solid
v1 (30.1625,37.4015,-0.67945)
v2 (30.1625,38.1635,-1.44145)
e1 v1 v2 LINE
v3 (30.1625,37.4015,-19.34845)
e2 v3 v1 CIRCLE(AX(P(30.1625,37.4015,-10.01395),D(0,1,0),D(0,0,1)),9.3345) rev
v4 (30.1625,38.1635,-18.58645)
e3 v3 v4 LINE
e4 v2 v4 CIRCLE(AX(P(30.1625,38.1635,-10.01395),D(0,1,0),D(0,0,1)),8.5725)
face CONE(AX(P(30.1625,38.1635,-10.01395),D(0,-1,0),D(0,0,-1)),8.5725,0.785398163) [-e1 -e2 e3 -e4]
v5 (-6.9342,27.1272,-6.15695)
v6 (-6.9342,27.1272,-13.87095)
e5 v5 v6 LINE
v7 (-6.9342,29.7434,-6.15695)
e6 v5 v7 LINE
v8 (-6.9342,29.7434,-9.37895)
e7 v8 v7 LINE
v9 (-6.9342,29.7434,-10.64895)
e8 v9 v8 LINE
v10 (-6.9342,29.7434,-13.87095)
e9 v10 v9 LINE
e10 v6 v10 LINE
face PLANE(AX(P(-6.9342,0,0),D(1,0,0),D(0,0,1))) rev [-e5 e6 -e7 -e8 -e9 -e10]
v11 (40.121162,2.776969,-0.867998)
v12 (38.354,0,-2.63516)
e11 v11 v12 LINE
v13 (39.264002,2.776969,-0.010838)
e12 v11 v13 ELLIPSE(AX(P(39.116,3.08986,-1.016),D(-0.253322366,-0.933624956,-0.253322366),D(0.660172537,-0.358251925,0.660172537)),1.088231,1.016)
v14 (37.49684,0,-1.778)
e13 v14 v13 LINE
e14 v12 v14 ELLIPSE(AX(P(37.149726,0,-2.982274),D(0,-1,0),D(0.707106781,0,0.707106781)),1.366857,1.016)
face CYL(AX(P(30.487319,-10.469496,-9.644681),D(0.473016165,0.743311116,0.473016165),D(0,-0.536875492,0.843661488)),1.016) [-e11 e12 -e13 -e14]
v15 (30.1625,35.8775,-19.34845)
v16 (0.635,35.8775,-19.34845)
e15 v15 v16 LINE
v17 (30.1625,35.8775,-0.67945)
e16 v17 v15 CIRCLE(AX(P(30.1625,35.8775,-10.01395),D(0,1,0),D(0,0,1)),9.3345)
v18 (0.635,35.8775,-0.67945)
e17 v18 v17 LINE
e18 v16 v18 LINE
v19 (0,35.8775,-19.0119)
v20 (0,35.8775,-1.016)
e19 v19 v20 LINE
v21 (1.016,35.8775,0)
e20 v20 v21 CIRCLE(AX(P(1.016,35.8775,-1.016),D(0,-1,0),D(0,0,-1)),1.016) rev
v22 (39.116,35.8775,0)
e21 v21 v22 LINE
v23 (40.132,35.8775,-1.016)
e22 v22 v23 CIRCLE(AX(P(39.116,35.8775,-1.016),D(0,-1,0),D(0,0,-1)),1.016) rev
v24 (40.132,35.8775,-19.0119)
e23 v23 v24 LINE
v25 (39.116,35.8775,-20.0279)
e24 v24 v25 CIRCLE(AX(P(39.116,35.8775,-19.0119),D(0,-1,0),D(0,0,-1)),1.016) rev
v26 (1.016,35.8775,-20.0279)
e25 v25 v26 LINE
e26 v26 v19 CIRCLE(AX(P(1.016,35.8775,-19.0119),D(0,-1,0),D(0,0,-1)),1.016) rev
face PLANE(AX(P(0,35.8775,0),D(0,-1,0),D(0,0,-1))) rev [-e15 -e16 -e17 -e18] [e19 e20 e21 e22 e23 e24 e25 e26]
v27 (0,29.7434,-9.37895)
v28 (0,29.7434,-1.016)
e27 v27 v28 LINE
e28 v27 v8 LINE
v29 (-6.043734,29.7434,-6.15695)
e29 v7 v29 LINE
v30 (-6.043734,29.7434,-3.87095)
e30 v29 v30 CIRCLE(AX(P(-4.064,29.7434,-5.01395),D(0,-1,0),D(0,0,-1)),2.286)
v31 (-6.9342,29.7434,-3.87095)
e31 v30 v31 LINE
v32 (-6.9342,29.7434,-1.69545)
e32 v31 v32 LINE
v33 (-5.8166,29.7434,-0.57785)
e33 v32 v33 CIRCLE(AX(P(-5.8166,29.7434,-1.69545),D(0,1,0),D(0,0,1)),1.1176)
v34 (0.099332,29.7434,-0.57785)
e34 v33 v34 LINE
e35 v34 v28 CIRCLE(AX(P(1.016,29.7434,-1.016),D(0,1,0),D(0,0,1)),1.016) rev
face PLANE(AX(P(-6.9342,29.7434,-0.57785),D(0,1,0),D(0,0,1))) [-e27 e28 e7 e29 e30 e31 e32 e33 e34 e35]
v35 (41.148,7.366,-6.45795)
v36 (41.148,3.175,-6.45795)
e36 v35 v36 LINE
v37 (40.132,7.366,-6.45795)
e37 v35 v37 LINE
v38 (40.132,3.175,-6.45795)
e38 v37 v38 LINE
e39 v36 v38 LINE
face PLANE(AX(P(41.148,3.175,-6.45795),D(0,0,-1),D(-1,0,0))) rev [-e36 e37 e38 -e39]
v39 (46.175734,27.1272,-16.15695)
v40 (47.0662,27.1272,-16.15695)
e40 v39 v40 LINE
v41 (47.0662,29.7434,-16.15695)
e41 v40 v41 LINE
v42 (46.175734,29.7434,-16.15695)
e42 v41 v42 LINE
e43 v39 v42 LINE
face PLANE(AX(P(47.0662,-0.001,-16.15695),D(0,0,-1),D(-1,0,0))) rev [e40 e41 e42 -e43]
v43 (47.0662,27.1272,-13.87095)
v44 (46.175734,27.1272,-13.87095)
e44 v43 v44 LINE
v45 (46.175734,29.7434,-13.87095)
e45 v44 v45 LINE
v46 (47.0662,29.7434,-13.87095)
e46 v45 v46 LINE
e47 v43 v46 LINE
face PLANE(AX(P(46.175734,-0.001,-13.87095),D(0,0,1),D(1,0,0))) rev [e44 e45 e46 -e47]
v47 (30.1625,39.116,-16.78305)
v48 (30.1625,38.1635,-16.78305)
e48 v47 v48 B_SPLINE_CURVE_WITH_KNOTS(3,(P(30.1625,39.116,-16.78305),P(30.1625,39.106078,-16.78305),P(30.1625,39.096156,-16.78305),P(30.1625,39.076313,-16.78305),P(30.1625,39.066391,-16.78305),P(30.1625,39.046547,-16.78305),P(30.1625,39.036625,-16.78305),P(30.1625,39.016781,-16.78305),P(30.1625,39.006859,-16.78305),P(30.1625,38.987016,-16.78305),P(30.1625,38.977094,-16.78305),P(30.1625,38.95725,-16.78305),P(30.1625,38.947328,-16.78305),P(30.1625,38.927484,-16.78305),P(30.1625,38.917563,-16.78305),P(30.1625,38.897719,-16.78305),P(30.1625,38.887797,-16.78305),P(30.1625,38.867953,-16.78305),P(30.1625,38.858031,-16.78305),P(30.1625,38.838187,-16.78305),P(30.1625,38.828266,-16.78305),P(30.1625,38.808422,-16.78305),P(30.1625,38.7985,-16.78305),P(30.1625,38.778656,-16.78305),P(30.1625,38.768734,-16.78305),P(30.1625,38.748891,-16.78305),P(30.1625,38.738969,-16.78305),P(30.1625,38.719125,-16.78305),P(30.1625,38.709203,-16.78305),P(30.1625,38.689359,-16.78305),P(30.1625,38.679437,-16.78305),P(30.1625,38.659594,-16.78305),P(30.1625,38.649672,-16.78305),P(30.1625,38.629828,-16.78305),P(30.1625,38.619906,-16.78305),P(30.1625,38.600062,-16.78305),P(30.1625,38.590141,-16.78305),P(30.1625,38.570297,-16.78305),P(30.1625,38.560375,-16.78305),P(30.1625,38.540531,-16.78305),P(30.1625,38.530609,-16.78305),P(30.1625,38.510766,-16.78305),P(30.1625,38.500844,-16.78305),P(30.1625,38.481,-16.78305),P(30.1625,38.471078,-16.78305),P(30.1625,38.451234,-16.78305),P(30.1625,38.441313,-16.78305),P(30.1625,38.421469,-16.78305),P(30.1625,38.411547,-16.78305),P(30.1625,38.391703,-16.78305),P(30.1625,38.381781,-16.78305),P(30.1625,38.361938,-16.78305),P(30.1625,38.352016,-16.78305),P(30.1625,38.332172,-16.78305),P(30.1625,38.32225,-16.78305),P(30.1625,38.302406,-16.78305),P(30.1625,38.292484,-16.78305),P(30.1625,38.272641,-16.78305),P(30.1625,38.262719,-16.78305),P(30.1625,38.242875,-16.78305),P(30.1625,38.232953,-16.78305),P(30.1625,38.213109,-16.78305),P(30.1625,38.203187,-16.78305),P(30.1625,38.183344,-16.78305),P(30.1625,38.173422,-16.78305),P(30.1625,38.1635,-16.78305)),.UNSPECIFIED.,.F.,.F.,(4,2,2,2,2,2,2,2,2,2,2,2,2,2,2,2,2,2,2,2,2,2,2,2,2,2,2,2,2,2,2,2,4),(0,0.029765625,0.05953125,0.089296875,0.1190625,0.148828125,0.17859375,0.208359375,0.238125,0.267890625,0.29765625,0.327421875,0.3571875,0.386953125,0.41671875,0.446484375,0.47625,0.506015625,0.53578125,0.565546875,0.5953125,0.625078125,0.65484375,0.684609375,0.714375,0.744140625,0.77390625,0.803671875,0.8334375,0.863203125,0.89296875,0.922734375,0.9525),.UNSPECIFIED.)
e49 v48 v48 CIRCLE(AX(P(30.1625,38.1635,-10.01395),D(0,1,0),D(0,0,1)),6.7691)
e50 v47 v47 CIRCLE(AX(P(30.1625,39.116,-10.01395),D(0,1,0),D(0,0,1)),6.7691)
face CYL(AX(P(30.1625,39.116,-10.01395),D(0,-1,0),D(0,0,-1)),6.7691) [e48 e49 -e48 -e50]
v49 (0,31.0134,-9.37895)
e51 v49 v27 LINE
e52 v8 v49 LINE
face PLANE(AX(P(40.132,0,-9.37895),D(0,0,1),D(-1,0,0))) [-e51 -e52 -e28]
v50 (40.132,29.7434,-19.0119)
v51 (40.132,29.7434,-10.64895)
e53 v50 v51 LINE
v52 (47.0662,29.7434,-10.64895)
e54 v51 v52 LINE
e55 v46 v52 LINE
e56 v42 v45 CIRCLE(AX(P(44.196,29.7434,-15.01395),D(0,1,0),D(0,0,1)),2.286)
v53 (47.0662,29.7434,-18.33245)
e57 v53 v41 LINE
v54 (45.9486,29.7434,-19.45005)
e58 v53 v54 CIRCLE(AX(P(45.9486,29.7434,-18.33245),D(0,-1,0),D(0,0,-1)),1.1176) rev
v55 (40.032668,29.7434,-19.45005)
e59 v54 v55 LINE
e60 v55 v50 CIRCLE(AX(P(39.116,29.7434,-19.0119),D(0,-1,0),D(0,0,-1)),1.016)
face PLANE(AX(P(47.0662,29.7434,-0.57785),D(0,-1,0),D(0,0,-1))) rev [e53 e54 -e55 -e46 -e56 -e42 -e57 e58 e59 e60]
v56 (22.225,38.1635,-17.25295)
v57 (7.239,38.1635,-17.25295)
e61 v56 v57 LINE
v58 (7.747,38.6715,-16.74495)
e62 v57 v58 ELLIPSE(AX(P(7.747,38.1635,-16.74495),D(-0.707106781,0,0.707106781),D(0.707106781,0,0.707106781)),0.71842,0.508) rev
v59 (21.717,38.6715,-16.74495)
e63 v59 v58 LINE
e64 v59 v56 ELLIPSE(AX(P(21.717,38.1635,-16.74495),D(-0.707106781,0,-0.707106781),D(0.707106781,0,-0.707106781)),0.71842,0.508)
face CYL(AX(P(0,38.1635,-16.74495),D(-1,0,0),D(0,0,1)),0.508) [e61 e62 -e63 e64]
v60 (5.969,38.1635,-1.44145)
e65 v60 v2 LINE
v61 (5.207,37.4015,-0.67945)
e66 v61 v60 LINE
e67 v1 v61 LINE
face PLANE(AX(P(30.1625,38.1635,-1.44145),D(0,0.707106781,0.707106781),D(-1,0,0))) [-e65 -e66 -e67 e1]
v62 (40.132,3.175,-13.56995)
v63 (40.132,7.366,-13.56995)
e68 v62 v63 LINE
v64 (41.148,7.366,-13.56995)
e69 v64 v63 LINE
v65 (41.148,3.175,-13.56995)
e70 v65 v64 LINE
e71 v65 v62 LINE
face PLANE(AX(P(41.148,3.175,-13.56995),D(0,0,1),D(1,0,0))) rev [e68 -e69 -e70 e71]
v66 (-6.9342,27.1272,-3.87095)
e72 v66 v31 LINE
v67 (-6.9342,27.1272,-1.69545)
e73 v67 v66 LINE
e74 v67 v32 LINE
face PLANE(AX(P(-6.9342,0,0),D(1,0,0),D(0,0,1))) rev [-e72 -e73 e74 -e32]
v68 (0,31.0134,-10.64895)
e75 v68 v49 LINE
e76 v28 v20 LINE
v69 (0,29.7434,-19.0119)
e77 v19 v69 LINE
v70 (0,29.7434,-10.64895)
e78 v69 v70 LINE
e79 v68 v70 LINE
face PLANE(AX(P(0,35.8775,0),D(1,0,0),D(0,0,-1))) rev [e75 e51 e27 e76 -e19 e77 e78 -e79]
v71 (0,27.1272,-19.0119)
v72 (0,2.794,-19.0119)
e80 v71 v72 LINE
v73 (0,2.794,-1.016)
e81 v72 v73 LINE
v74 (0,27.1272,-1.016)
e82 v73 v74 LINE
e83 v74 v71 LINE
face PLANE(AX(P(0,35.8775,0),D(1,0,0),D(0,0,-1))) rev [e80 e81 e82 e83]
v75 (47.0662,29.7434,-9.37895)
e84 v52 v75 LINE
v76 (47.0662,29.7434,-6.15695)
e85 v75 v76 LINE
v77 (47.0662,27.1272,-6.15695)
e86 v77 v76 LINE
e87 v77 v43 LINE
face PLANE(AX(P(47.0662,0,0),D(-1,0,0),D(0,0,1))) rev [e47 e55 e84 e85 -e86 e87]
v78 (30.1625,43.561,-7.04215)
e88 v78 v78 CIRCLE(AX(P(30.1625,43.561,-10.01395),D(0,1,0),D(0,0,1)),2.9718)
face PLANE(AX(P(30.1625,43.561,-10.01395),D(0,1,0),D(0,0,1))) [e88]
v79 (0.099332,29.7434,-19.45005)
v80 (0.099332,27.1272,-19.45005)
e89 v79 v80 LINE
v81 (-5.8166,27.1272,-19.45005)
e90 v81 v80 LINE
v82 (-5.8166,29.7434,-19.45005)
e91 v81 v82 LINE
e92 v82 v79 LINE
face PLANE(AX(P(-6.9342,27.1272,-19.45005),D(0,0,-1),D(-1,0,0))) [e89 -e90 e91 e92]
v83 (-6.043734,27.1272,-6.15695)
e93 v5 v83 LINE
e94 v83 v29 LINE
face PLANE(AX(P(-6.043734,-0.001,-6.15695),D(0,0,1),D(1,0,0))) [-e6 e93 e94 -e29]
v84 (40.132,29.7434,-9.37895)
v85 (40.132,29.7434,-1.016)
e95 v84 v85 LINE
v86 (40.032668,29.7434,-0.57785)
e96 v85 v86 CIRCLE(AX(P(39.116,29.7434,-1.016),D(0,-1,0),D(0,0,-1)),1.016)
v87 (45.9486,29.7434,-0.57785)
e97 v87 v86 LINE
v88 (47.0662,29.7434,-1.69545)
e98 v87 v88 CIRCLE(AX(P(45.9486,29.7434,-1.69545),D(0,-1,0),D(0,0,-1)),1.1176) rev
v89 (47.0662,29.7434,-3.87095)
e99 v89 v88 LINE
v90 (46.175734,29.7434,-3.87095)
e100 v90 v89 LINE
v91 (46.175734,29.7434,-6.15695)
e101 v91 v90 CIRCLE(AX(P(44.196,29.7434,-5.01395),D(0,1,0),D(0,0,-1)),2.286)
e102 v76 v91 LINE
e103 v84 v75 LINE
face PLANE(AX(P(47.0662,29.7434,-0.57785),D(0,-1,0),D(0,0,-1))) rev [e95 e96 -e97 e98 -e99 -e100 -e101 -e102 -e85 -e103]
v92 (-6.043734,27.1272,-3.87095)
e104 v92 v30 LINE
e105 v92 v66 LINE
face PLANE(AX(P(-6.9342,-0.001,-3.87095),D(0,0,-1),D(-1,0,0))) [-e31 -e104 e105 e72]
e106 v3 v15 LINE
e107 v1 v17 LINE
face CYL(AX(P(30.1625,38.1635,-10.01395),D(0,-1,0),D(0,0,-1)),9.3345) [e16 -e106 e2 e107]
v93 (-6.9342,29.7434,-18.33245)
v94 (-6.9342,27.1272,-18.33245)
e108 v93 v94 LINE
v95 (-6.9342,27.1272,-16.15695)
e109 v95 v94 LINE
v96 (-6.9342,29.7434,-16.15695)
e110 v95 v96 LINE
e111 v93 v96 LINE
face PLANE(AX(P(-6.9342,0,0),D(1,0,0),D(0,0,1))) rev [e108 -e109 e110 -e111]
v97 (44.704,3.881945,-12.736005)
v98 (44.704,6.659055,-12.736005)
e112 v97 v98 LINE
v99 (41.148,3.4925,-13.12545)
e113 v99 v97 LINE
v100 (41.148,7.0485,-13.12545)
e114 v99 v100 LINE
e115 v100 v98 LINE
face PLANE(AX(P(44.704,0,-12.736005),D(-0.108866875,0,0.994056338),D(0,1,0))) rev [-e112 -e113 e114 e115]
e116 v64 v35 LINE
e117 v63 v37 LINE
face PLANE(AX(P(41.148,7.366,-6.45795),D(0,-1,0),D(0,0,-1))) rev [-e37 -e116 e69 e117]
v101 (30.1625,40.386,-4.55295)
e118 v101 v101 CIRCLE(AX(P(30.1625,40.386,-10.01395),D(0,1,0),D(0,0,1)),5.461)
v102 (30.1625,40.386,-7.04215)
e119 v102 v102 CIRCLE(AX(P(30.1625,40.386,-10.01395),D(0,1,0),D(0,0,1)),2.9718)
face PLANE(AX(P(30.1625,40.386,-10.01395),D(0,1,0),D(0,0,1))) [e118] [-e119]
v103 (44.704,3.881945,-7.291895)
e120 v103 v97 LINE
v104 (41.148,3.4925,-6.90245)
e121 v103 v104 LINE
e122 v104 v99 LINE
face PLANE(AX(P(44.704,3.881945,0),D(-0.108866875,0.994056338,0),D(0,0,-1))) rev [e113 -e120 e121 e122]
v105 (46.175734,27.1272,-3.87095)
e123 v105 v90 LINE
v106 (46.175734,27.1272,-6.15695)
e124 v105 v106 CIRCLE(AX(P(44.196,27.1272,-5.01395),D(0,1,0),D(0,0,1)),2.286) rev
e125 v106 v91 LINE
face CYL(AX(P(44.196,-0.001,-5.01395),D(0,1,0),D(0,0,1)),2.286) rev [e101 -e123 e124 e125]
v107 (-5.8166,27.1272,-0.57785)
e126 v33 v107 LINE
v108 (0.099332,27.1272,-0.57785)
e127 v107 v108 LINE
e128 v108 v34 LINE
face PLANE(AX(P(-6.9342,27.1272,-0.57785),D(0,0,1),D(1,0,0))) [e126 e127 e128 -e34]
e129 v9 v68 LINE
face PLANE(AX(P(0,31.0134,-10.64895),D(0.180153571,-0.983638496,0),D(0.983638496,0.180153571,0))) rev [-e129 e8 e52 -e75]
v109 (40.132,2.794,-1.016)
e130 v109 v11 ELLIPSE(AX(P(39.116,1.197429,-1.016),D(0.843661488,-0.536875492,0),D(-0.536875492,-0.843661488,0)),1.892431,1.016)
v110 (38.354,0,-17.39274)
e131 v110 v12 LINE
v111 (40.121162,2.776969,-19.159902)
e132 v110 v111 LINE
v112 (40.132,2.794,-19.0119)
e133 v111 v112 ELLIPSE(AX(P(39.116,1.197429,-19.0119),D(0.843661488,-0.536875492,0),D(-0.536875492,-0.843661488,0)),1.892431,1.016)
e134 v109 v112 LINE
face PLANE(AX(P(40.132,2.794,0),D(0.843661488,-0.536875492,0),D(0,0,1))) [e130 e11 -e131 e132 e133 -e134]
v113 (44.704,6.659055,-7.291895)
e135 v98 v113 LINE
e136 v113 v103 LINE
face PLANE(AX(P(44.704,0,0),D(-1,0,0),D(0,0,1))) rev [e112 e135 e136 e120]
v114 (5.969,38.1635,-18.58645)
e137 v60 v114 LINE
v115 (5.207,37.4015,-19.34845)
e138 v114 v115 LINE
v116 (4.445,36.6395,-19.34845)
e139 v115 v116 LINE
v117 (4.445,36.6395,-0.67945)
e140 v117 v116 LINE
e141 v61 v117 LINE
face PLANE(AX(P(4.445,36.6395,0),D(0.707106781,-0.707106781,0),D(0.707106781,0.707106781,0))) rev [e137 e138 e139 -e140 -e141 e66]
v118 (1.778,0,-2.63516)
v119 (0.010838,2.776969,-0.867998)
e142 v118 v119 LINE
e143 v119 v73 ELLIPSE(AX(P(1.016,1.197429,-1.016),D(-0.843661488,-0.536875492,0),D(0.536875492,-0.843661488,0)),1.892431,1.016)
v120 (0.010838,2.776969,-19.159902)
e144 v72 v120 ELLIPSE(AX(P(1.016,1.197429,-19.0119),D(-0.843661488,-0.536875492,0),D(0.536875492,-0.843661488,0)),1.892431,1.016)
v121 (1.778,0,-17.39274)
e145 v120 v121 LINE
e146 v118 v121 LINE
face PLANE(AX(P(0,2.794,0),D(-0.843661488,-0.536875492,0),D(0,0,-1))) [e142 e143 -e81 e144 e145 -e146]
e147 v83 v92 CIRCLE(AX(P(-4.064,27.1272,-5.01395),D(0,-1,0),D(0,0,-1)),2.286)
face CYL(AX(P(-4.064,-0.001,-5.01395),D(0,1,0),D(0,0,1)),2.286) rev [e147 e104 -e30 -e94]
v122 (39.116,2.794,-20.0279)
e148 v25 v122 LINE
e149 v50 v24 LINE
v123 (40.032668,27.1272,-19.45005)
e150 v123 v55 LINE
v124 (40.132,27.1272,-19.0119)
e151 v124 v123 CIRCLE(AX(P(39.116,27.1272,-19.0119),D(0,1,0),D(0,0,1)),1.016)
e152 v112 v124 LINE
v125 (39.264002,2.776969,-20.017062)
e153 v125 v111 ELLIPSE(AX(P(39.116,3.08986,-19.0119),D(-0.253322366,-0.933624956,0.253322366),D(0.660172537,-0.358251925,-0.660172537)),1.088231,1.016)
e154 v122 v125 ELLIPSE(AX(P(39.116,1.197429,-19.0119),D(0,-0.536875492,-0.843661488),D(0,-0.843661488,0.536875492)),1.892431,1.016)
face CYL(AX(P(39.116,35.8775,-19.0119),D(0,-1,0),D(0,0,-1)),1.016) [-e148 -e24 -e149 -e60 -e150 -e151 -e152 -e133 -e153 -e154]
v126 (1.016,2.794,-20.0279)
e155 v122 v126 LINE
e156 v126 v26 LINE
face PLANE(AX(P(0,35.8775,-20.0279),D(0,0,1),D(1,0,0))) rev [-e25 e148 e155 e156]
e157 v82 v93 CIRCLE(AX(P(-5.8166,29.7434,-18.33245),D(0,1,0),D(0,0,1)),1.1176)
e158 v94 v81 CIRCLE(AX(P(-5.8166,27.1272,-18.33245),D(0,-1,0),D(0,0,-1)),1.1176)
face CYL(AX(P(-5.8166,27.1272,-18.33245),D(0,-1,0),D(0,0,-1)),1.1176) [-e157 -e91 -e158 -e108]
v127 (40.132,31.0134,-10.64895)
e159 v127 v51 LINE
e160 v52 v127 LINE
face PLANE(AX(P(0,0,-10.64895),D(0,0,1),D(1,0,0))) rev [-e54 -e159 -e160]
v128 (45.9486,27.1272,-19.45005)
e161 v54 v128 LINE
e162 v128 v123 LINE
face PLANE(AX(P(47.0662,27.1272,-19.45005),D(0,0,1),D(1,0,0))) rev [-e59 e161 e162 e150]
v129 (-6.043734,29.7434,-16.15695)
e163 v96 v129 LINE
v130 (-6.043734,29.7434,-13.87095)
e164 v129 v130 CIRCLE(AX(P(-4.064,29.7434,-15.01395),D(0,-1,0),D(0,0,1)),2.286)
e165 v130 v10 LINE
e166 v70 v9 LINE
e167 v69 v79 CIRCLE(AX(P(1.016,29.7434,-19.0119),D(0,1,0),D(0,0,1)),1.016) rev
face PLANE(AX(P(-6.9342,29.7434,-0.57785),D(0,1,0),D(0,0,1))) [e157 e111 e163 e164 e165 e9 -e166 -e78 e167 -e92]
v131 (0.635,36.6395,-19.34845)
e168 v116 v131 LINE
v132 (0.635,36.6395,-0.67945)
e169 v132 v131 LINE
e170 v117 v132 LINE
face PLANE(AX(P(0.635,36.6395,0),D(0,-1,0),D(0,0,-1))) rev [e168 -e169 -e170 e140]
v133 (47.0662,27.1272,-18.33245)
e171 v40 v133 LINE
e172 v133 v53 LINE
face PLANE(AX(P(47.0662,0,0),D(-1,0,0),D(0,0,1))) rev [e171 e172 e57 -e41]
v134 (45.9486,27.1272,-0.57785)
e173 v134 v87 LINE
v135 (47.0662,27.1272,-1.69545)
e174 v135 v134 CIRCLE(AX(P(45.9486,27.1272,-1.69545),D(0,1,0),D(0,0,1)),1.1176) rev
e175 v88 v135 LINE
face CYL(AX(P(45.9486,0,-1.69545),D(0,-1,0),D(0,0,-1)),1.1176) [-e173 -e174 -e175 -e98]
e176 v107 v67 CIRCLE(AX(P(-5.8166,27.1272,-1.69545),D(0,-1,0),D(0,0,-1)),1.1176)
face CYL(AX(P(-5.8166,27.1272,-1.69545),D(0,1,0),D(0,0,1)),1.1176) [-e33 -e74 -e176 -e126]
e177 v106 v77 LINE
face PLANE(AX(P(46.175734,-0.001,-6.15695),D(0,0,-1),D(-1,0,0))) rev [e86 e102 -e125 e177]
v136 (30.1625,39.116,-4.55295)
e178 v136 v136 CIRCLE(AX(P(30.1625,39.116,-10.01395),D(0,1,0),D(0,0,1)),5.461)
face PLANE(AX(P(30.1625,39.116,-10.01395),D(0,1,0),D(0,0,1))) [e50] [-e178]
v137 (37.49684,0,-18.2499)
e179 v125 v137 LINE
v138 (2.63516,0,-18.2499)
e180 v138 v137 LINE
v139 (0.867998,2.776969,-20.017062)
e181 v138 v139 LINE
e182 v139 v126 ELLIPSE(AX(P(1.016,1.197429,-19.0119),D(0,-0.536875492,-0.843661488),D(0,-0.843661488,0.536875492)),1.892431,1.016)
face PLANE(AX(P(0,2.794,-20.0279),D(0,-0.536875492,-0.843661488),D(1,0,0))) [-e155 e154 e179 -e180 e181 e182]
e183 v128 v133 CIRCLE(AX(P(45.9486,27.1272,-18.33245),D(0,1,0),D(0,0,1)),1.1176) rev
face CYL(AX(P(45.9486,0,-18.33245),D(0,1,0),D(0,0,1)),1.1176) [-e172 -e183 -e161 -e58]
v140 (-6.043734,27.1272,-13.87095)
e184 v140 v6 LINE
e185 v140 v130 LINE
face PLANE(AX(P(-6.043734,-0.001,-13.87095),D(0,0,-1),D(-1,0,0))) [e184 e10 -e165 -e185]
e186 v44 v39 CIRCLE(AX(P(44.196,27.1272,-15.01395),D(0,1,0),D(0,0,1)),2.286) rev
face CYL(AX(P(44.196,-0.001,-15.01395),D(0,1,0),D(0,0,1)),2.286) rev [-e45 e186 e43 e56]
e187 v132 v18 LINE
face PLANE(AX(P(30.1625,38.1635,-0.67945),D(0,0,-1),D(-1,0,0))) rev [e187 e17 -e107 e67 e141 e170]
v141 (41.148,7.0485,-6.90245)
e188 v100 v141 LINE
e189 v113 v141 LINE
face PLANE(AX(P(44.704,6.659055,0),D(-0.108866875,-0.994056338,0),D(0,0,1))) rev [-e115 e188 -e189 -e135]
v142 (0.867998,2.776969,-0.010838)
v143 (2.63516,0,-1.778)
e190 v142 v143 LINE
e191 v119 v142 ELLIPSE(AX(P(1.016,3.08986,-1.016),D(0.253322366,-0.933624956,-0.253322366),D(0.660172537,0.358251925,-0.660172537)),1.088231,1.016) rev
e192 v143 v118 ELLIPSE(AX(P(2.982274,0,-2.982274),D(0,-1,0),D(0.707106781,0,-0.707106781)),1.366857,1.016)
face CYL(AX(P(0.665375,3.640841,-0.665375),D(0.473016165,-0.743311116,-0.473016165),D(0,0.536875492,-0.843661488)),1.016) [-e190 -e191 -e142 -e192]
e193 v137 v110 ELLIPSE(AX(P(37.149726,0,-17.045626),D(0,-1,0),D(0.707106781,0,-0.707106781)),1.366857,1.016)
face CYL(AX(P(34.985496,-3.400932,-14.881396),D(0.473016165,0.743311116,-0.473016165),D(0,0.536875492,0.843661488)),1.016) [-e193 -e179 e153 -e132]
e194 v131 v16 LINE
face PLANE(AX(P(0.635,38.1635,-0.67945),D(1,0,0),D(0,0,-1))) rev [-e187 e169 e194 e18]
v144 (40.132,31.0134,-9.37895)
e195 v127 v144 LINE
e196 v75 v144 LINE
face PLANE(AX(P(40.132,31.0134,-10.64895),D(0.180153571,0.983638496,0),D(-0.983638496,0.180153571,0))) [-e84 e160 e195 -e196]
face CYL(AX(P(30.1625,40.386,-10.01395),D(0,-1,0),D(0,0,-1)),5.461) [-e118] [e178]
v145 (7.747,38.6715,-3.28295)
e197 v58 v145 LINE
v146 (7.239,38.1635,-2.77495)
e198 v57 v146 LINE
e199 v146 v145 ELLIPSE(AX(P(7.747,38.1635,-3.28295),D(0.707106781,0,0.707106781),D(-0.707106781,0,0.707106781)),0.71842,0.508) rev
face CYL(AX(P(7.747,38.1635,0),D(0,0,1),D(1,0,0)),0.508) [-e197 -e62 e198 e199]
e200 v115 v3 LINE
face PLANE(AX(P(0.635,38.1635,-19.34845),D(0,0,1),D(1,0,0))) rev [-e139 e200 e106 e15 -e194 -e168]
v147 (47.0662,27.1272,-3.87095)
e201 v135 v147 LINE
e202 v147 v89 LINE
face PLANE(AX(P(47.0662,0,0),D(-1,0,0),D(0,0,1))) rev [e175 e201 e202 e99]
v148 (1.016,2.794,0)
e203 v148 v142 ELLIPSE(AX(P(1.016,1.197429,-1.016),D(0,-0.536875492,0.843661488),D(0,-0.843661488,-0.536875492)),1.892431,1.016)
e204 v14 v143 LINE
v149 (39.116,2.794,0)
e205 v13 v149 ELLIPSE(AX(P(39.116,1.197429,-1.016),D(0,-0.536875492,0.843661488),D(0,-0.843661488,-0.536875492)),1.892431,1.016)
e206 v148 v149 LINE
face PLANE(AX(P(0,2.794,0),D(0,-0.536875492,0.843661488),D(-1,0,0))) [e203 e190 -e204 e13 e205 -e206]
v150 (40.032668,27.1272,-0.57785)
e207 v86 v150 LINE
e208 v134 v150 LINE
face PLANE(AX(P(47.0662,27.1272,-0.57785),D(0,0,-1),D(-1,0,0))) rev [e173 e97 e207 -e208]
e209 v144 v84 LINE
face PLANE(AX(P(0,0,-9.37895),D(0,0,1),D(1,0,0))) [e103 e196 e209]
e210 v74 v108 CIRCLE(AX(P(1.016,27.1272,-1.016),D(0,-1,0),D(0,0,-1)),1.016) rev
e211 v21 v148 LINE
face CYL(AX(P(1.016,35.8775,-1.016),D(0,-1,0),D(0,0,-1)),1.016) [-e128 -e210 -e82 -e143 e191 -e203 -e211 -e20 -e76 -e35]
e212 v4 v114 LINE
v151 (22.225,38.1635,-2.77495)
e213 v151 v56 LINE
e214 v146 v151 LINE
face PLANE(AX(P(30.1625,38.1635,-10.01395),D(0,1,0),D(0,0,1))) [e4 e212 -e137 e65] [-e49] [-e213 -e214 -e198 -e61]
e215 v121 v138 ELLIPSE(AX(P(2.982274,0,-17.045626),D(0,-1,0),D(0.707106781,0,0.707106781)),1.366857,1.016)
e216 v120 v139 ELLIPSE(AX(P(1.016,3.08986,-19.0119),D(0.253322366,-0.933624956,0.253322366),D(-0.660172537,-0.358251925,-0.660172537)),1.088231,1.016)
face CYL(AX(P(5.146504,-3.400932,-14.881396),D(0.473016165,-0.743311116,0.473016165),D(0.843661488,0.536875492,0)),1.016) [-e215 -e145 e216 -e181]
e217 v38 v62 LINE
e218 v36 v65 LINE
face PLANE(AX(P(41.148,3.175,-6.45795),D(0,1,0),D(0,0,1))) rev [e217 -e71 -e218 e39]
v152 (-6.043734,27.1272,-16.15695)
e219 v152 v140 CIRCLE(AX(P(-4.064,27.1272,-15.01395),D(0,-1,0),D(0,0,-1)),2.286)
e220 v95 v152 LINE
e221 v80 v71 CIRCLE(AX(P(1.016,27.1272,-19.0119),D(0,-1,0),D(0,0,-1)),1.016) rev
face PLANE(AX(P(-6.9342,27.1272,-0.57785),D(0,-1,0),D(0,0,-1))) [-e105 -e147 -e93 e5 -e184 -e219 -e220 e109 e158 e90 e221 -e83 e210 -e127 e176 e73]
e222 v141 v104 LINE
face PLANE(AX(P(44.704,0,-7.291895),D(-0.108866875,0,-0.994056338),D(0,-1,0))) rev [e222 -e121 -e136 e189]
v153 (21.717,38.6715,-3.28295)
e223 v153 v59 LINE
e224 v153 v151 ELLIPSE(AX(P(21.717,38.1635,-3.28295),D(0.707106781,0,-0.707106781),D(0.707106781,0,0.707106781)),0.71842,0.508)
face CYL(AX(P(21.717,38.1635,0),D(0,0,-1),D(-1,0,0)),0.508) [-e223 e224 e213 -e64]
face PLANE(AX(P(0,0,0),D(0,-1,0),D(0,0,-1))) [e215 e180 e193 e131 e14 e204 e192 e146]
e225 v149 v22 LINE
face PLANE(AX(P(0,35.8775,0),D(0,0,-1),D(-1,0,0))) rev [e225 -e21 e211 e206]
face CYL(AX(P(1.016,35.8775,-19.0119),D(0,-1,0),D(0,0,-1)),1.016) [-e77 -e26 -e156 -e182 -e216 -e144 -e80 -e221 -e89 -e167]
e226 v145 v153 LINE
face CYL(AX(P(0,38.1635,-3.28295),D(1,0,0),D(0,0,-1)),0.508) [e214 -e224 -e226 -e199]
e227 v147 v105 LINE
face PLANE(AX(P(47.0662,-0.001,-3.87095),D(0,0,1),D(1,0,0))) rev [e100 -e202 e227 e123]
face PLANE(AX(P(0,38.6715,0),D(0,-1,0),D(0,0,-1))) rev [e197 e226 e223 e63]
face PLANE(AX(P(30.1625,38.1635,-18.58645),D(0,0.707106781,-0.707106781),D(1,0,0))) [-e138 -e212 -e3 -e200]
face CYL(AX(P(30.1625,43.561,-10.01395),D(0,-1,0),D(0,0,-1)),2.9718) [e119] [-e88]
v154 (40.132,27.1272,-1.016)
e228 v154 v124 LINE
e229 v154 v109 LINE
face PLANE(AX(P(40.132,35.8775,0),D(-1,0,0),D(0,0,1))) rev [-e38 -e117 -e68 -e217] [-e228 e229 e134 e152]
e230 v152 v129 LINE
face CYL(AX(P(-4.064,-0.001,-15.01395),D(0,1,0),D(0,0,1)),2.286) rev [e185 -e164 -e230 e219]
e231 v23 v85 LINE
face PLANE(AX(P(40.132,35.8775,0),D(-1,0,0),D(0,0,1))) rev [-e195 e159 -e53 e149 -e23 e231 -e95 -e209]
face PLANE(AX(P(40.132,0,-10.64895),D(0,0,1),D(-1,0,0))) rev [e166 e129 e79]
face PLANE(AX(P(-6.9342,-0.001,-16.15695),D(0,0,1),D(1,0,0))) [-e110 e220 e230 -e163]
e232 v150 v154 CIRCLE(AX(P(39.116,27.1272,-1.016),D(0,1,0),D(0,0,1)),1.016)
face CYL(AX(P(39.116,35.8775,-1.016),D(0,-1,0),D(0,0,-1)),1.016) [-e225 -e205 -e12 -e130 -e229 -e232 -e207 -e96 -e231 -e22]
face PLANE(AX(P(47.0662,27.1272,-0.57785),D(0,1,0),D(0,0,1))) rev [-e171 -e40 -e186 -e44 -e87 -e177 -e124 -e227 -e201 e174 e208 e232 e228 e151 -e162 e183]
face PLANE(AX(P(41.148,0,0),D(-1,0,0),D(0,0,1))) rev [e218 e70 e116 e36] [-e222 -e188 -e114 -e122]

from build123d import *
from OCP.BRepFilletAPI import BRepFilletAPI_MakeChamfer

# Parameters (mm, degrees)
SKETCH1_W            = 40.132
SKETCH1_H            = 20.0279
BOSS_EXTRUDE1_DEPTH  = 35.8775
CHAMFER1_SIZE        = 1.778
CHAMFER1_SIZE2       = 2.794
SKETCH2_W            = 7.112
SKETCH2_H            = 4.191
BOSS_EXTRUDE2_DEPTH  = 1.016
SKETCH3_W            = 6.223
SKETCH3_H            = 3.556
BOSS_EXTRUDE3_DEPTH  = 3.556
CHAMFER2_SIZE        = 3.556
CHAMFER2_SIZE_2      = 0.389445338
SKETCH4_W            = 18.8722
SKETCH4_H            = 2.6162
BOSS_EXTRUDE4_DEPTH  = 6.9342
BOSS_EXTRUDE5_DEPTH  = 0.635
CUT_EXTRUDE1_REACH   = 61.169
FILLET2_R            = 1.1176
FILLET2_OF_MIRROR3_R = 1.1176
BOSS_EXTRUDE6_DEPTH  = 2.286
CHAMFER3_SIZE        = 0.762
CUT_EXTRUDE2_DEPTH   = 64.608509117
FILLET3_R            = 1.016
SKETCH12_R           = 6.7691
BOSS_EXTRUDE7_DEPTH  = 0.9525
SKETCH13_R           = 5.461
BOSS_EXTRUDE8_DEPTH  = 1.27
SKETCH15_R           = 2.9718
BOSS_EXTRUDE9_DEPTH  = 3.175
SKETCH16_W           = 14.986
SKETCH16_H           = 14.478
BOSS_EXTRUDE10_DEPTH = 0.508
FILLET4_R            = 0.508


# Some blends are built 0.0001 mm under size
with BuildPart() as part:
    # Sketch1 → Boss-Extrude1 (new body)
    with BuildSketch(Plane(origin=(0, 0, 0), x_dir=(1, 0, 0), z_dir=(0, 1, 0))):
        with Locations((20.066, 10.01395)):
            Rectangle(SKETCH1_W, SKETCH1_H)
    extrude(amount=BOSS_EXTRUDE1_DEPTH)

    # Chamfer1
    chamfer1_edges = [part.edges().sort_by_distance(p)[0] for p in [
        (20.066, 0, -20.0279),
        (40.132, 0, -10.01395),
        (20.066, 0, 0),
        (0, 0, -10.01395),
    ]]
    chamfer1_side = [part.faces().sort_by_distance(p)[0] for p in [
        (20.066, 0, -10.01395),
    ]]
    chamfer(chamfer1_edges, length=CHAMFER1_SIZE, length2=CHAMFER1_SIZE2, reference=chamfer1_side[0])

    # Sketch2 → Boss-Extrude2 (add)
    with BuildSketch(Plane(origin=(40.132, 0, 0), x_dir=(0, 0, -1), z_dir=(1, 0, 0))):
        with Locations((10.01395, 5.2705)):
            Rectangle(SKETCH2_W, SKETCH2_H)
    extrude(amount=BOSS_EXTRUDE2_DEPTH)

    # Sketch3 → Boss-Extrude3 (add)
    with BuildSketch(Plane(origin=(41.148, 0, 0), x_dir=(0, 0, -1), z_dir=(1, 0, 0))):
        with Locations((10.01395, 5.2705)):
            Rectangle(SKETCH3_W, SKETCH3_H)
    extrude(amount=BOSS_EXTRUDE3_DEPTH)

    # Chamfer2
    chamfer2_edges_1 = [part.edges().sort_by_distance(p)[0] for p in [
        (44.704, 3.4925, -10.01395),
    ]]
    chamfer2_side_1 = [part.faces().sort_by_distance(p)[0] for p in [
        (44.696211093, 3.4925, -10.01395),
    ]]
    chamfer2_edges_2 = [part.edges().sort_by_distance(p)[0] for p in [
        (44.704, 5.2705, -6.90245),
    ]]
    chamfer2_side_2 = [part.faces().sort_by_distance(p)[0] for p in [
        (44.696211093, 5.2705, -6.90245),
    ]]
    chamfer2_edges_3 = [part.edges().sort_by_distance(p)[0] for p in [
        (44.704, 7.0485, -10.01395),
    ]]
    chamfer2_side_3 = [part.faces().sort_by_distance(p)[0] for p in [
        (44.696211093, 7.0485, -10.01395),
    ]]
    chamfer2_edges_4 = [part.edges().sort_by_distance(p)[0] for p in [
        (44.704, 5.2705, -13.12545),
    ]]
    chamfer2_side_4 = [part.faces().sort_by_distance(p)[0] for p in [
        (44.696211093, 5.2705, -13.12545),
    ]]
    chamfer2 = BRepFilletAPI_MakeChamfer(part.part.solid().wrapped)
    for e in chamfer2_edges_1:
        chamfer2.Add(CHAMFER2_SIZE - 0.0001, CHAMFER2_SIZE_2 - 0.0001, e.wrapped, chamfer2_side_1[0].wrapped)
    for e in chamfer2_edges_2:
        chamfer2.Add(CHAMFER2_SIZE - 0.0001, CHAMFER2_SIZE_2 - 0.0001, e.wrapped, chamfer2_side_2[0].wrapped)
    for e in chamfer2_edges_3:
        chamfer2.Add(CHAMFER2_SIZE - 0.0001, CHAMFER2_SIZE_2 - 0.0001, e.wrapped, chamfer2_side_3[0].wrapped)
    for e in chamfer2_edges_4:
        chamfer2.Add(CHAMFER2_SIZE - 0.0001, CHAMFER2_SIZE_2 - 0.0001, e.wrapped, chamfer2_side_4[0].wrapped)
    add(Compound.cast(chamfer2.Shape()), mode=Mode.REPLACE)  # a hair under: the kernel refuses the full size

    # Sketch4 → Boss-Extrude4 (add)
    with BuildSketch(Plane(origin=(40.132, 0, 0), x_dir=(0, 0, -1), z_dir=(1, 0, 0))):
        with Locations((10.01395, 28.4353)):
            Rectangle(SKETCH4_W, SKETCH4_H)
    boss_extrude4 = extrude(amount=BOSS_EXTRUDE4_DEPTH)

    # Sketch8 → Boss-Extrude5 (add, symmetric)
    with BuildSketch(Plane.XY.offset(-10.01395)):
        Polygon((47.0662, 29.7434), (40.132, 29.7434), (40.132, 31.0134), align=None)
    boss_extrude5 = extrude(amount=BOSS_EXTRUDE5_DEPTH, both=True)

    # Sketch9 → Cut-Extrude1 (cut, up to next)
    with BuildSketch(Plane(origin=(0, 29.7434, 0), x_dir=(1, 0, 0), z_dir=(0, 1, 0)), mode=Mode.PRIVATE) as cut_extrude1_sk1:
        with BuildLine():
            Line((47.0662, 3.87095), (46.175734073, 3.87095))
            ThreePointArc((46.175734073, 3.87095), (41.91, 5.01395), (46.175734073, 6.15695))
            Line((46.175734073, 6.15695), (47.0662, 6.15695))
            Line((47.0662, 6.15695), (47.0662, 3.87095))
        make_face()
    cut_extrude1_tool1 = extrude(cut_extrude1_sk1.sketch, amount=-CUT_EXTRUDE1_REACH, mode=Mode.PRIVATE) & part.part
    # Sketch9 → Cut-Extrude1 (cut, up to next)
    with BuildSketch(Plane(origin=(0, 29.7434, 0), x_dir=(1, 0, 0), z_dir=(0, 1, 0)), mode=Mode.PRIVATE) as cut_extrude1_sk2:
        with BuildLine():
            Line((46.175734073, 13.87095), (47.0662, 13.87095))
            Line((47.0662, 13.87095), (47.0662, 16.15695))
            Line((47.0662, 16.15695), (46.175734073, 16.15695))
            ThreePointArc((46.175734073, 16.15695), (41.91, 15.01395), (46.175734073, 13.87095))
        make_face()
    cut_extrude1_tool2 = extrude(cut_extrude1_sk2.sketch, amount=-CUT_EXTRUDE1_REACH, mode=Mode.PRIVATE) & part.part
    cut_extrude1_1 = cut_extrude1_tool1.solids().sort_by_distance((44.41518, 29.7434, -5.01395))[0]
    add(cut_extrude1_1, mode=Mode.SUBTRACT)
    cut_extrude1_2 = cut_extrude1_tool2.solids().sort_by_distance((44.41518, 29.7434, -15.01395))[0]
    add(cut_extrude1_2, mode=Mode.SUBTRACT)
    cut_extrude1 = cut_extrude1_1 + cut_extrude1_2  # Cut-Extrude1 as one shape, for the pattern or mirror that repeats it

    # Fillet2
    fillet2_edges = [part.edges().sort_by_distance(p)[0] for p in [
        (47.0662, 28.4353, -19.45005),
        (47.0662, 28.4353, -0.57785),
    ]]
    fillet(fillet2_edges, radius=FILLET2_R)

    # Mirror3: Boss-Extrude4, Boss-Extrude5, Cut-Extrude1 across plane
    add(boss_extrude4.mirror(Plane(origin=(20.066, 0, 0), x_dir=(0, 0, 1), z_dir=(1, 0, 0))))
    add(boss_extrude5.mirror(Plane(origin=(20.066, 0, 0), x_dir=(0, 0, 1), z_dir=(1, 0, 0))))
    add(cut_extrude1.mirror(Plane(origin=(20.066, 0, 0), x_dir=(0, 0, 1), z_dir=(1, 0, 0))), mode=Mode.SUBTRACT)

    # Fillet2 of Mirror3
    fillet2_of_mirror3_edges = [part.edges().sort_by_distance(p)[0] for p in [
        (-6.9342, 28.4353, -19.45005),
        (-6.9342, 28.4353, -0.57785),
    ]]
    fillet(fillet2_of_mirror3_edges, radius=FILLET2_OF_MIRROR3_R)

    # Sketch10 → Boss-Extrude6 (add)
    with BuildSketch(Plane(origin=(0, 35.8775, 0), x_dir=(1, 0, 0), z_dir=(0, 1, 0))):
        with BuildLine():
            Line((30.1625, 0.67945), (0.635, 0.67945))
            Line((0.635, 0.67945), (0.635, 19.34845))
            Line((0.635, 19.34845), (30.1625, 19.34845))
            ThreePointArc((30.1625, 19.34845), (39.497, 10.01395), (30.1625, 0.67945))
        make_face()
    extrude(amount=BOSS_EXTRUDE6_DEPTH)

    # Chamfer3
    chamfer3_edges = [part.edges().sort_by_distance(p)[0] for p in [
        (39.497, 38.1635, -10.01395),
        (15.39875, 38.1635, -19.34845),
        (0.635, 38.1635, -10.01395),
        (15.39875, 38.1635, -0.67945),
    ]]
    chamfer(chamfer3_edges, length=CHAMFER3_SIZE)

    # Sketch11 → Cut-Extrude2 (cut, through all)
    with BuildSketch(Plane(origin=(0, 0, -19.34845), x_dir=(-1, 0, 0), z_dir=(0, 0, -1))):
        Polygon((-0.635, 36.6395), (-4.445, 36.6395), (-5.969, 38.1635), (-0.635, 38.1635), align=None)
    extrude(amount=-CUT_EXTRUDE2_DEPTH, mode=Mode.SUBTRACT)

    # Fillet3
    # the kernel refuses this fillet: 1.016 mm, written as the material it takes off along each edge
    with BuildSketch(Plane(origin=(0, 0.254, 0), x_dir=(1, 0, 0), z_dir=(0, 1, 0))) as fillet3_piece_1_section:
        with BuildLine():
            CenterArc((FILLET3_R, FILLET3_R), FILLET3_R, 180, 90)
            Line((0, FILLET3_R), (0, 0))
            Line((0, 0), (FILLET3_R, 0))
        make_face()
    fillet3_piece_1 = extrude(amount=38.1635, mode=Mode.PRIVATE)
    fillet3_piece_1 = split(fillet3_piece_1, bisect_by=Plane(origin=(0.25078898, 27.1272, -0.181992071), z_dir=(0, -1, 0)), keep=Keep.TOP, mode=Mode.PRIVATE)
    fillet3_piece_1 = split(fillet3_piece_1, bisect_by=Plane(origin=(0.25078898, 13.6906, -0.57785), z_dir=(0, 0, 1)), keep=Keep.TOP, mode=Mode.PRIVATE)
    add(fillet3_piece_1, mode=Mode.SUBTRACT)
    with BuildSketch(Plane(origin=(0, 0.254, 0), x_dir=(1, 0, 0), z_dir=(0, 1, 0))) as fillet3_piece_2_section:
        with BuildLine():
            CenterArc((FILLET3_R, FILLET3_R), FILLET3_R, 180, 90)
            Line((0, FILLET3_R), (0, 0))
            Line((0, 0), (FILLET3_R, 0))
        make_face()
    fillet3_piece_2 = extrude(amount=38.1635, mode=Mode.PRIVATE)
    fillet3_piece_2 = split(fillet3_piece_2, bisect_by=Plane(origin=(0.014243529, 27.1272, -0.728902871), z_dir=(0, -1, 0)), keep=Keep.TOP, mode=Mode.PRIVATE)
    fillet3_piece_2 = split(fillet3_piece_2, bisect_by=Plane(origin=(0.014243529, 13.6906, -0.57785), z_dir=(0, 0, -1)), keep=Keep.TOP, mode=Mode.PRIVATE)
    add(fillet3_piece_2, mode=Mode.SUBTRACT)
    with BuildSketch(Plane(origin=(0, 0.254, 0), x_dir=(1, 0, 0), z_dir=(0, 1, 0))) as fillet3_piece_3_section:
        with BuildLine():
            CenterArc((FILLET3_R, FILLET3_R), FILLET3_R, 180, 90)
            Line((0, FILLET3_R), (0, 0))
            Line((0, 0), (FILLET3_R, 0))
        make_face()
    fillet3_piece_3 = extrude(amount=38.1635, mode=Mode.PRIVATE)
    fillet3_piece_3 = split(fillet3_piece_3, bisect_by=Plane(origin=(0.25078898, 27.1272, -0.181992071), z_dir=(0, 1, 0)), keep=Keep.TOP, mode=Mode.PRIVATE)
    fillet3_piece_3 = split(fillet3_piece_3, bisect_by=Plane(origin=(0.25078898, 29.7434, -0.181992071), z_dir=(0, -1, 0)), keep=Keep.TOP, mode=Mode.PRIVATE)
    fillet3_piece_3 = split(fillet3_piece_3, bisect_by=Plane(origin=(0.25078898, 28.4353, -0.57785), z_dir=(0, 0, 1)), keep=Keep.TOP, mode=Mode.PRIVATE)
    add(fillet3_piece_3, mode=Mode.SUBTRACT)
    with BuildSketch(Plane(origin=(0, 0.254, 0), x_dir=(1, 0, 0), z_dir=(0, 1, 0))) as fillet3_piece_4_section:
        with BuildLine():
            CenterArc((FILLET3_R, FILLET3_R), FILLET3_R, 180, 90)
            Line((0, FILLET3_R), (0, 0))
            Line((0, 0), (FILLET3_R, 0))
        make_face()
    fillet3_piece_4 = extrude(amount=38.1635, mode=Mode.PRIVATE)
    fillet3_piece_4 = split(fillet3_piece_4, bisect_by=Plane(origin=(0.25078898, 29.7434, -0.181992071), z_dir=(0, 1, 0)), keep=Keep.TOP, mode=Mode.PRIVATE)
    fillet3_piece_4 = split(fillet3_piece_4, bisect_by=Plane(origin=(0.25078898, 34.08045, -0.57785), z_dir=(0, 0, 1)), keep=Keep.TOP, mode=Mode.PRIVATE)
    add(fillet3_piece_4, mode=Mode.SUBTRACT)
    with BuildSketch(Plane(origin=(0, 0.254, 0), x_dir=(1, 0, 0), z_dir=(0, 1, 0))) as fillet3_piece_5_section:
        with BuildLine():
            CenterArc((FILLET3_R, FILLET3_R), FILLET3_R, 180, 90)
            Line((0, FILLET3_R), (0, 0))
            Line((0, 0), (FILLET3_R, 0))
        make_face()
    fillet3_piece_5 = extrude(amount=38.1635, mode=Mode.PRIVATE)
    fillet3_piece_5 = split(fillet3_piece_5, bisect_by=Plane(origin=(0.014243529, 29.7434, -0.728902871), z_dir=(0, 1, 0)), keep=Keep.TOP, mode=Mode.PRIVATE)
    fillet3_piece_5 = split(fillet3_piece_5, bisect_by=Plane(origin=(0.014243529, 34.08045, -0.57785), z_dir=(0, 0, -1)), keep=Keep.TOP, mode=Mode.PRIVATE)
    add(fillet3_piece_5, mode=Mode.SUBTRACT)
    with BuildSketch(Plane(origin=(2.671059361, -1.403378995, -2.671059361), x_dir=(0.8810537485094524, 0.39906552138369294, 0.25395078633507695), z_dir=(-0.4730161648796398, 0.7433111162394347, 0.4730161648796402)), Plane(origin=(2.671059361, -1.403378995, -17.356840639), x_dir=(-0.25395078633507684, 0.39906552138369294, 0.8810537485094524), z_dir=(-0.47301616487964054, 0.7433111162394347, -0.4730161648796398))) as fillet3_piece_6:
        with BuildLine():
            CenterArc((FILLET3_R * 0.743311116239, FILLET3_R), FILLET3_R, 196.752335114, 73.247664886)
            Line((-FILLET3_R * 0.21424849821, FILLET3_R * 0.711764705882), (0, 0))
            Line((0, 0), (FILLET3_R * 0.743311116239, 0))
        make_face()
    extrude(amount=7.534877212, mode=Mode.SUBTRACT)
    with BuildSketch(Plane(origin=(0, 0.254, -20.0279), x_dir=(0, 0, 1), z_dir=(0, 1, 0))) as fillet3_piece_7_section:
        with BuildLine():
            CenterArc((FILLET3_R, FILLET3_R), FILLET3_R, 180, 90)
            Line((0, FILLET3_R), (0, 0))
            Line((0, 0), (FILLET3_R, 0))
        make_face()
    fillet3_piece_7 = extrude(amount=38.1635, mode=Mode.PRIVATE)
    fillet3_piece_7 = split(fillet3_piece_7, bisect_by=Plane(origin=(0.014243529, 27.1272, -19.298997129), z_dir=(0, -1, 0)), keep=Keep.TOP, mode=Mode.PRIVATE)
    fillet3_piece_7 = split(fillet3_piece_7, bisect_by=Plane(origin=(0.014243529, 13.6906, -19.45005), z_dir=(0, 0, 1)), keep=Keep.TOP, mode=Mode.PRIVATE)
    add(fillet3_piece_7, mode=Mode.SUBTRACT)
    with BuildSketch(Plane(origin=(0, 0.254, -20.0279), x_dir=(0, 0, 1), z_dir=(0, 1, 0))) as fillet3_piece_8_section:
        with BuildLine():
            CenterArc((FILLET3_R, FILLET3_R), FILLET3_R, 180, 90)
            Line((0, FILLET3_R), (0, 0))
            Line((0, 0), (FILLET3_R, 0))
        make_face()
    fillet3_piece_8 = extrude(amount=38.1635, mode=Mode.PRIVATE)
    fillet3_piece_8 = split(fillet3_piece_8, bisect_by=Plane(origin=(0.25078898, 27.1272, -19.845907929), z_dir=(0, -1, 0)), keep=Keep.TOP, mode=Mode.PRIVATE)
    fillet3_piece_8 = split(fillet3_piece_8, bisect_by=Plane(origin=(0.25078898, 13.6906, -19.45005), z_dir=(0, 0, -1)), keep=Keep.TOP, mode=Mode.PRIVATE)
    add(fillet3_piece_8, mode=Mode.SUBTRACT)
    with BuildSketch(Plane(origin=(0, 0.254, -20.0279), x_dir=(0, 0, 1), z_dir=(0, 1, 0))) as fillet3_piece_9_section:
        with BuildLine():
            CenterArc((FILLET3_R, FILLET3_R), FILLET3_R, 180, 90)
            Line((0, FILLET3_R), (0, 0))
            Line((0, 0), (FILLET3_R, 0))
        make_face()
    fillet3_piece_9 = extrude(amount=38.1635, mode=Mode.PRIVATE)
    fillet3_piece_9 = split(fillet3_piece_9, bisect_by=Plane(origin=(0.25078898, 27.1272, -19.845907929), z_dir=(0, 1, 0)), keep=Keep.TOP, mode=Mode.PRIVATE)
    fillet3_piece_9 = split(fillet3_piece_9, bisect_by=Plane(origin=(0.25078898, 28.4353, -19.45005), z_dir=(0, 0, -1)), keep=Keep.TOP, mode=Mode.PRIVATE)
    fillet3_piece_9 = split(fillet3_piece_9, bisect_by=Plane(origin=(0.25078898, 29.7434, -19.845907929), z_dir=(0, -1, 0)), keep=Keep.TOP, mode=Mode.PRIVATE)
    add(fillet3_piece_9, mode=Mode.SUBTRACT)
    with BuildSketch(Plane(origin=(0, 0.254, -20.0279), x_dir=(0, 0, 1), z_dir=(0, 1, 0))) as fillet3_piece_10_section:
        with BuildLine():
            CenterArc((FILLET3_R, FILLET3_R), FILLET3_R, 180, 90)
            Line((0, FILLET3_R), (0, 0))
            Line((0, 0), (FILLET3_R, 0))
        make_face()
    fillet3_piece_10 = extrude(amount=38.1635, mode=Mode.PRIVATE)
    fillet3_piece_10 = split(fillet3_piece_10, bisect_by=Plane(origin=(0.014243529, 34.08045, -19.45005), z_dir=(0, 0, 1)), keep=Keep.TOP, mode=Mode.PRIVATE)
    fillet3_piece_10 = split(fillet3_piece_10, bisect_by=Plane(origin=(0.014243529, 29.7434, -19.298997129), z_dir=(0, 1, 0)), keep=Keep.TOP, mode=Mode.PRIVATE)
    add(fillet3_piece_10, mode=Mode.SUBTRACT)
    with BuildSketch(Plane(origin=(0, 0.254, -20.0279), x_dir=(0, 0, 1), z_dir=(0, 1, 0))) as fillet3_piece_11_section:
        with BuildLine():
            CenterArc((FILLET3_R, FILLET3_R), FILLET3_R, 180, 90)
            Line((0, FILLET3_R), (0, 0))
            Line((0, 0), (FILLET3_R, 0))
        make_face()
    fillet3_piece_11 = extrude(amount=38.1635, mode=Mode.PRIVATE)
    fillet3_piece_11 = split(fillet3_piece_11, bisect_by=Plane(origin=(0.25078898, 34.08045, -19.45005), z_dir=(0, 0, -1)), keep=Keep.TOP, mode=Mode.PRIVATE)
    fillet3_piece_11 = split(fillet3_piece_11, bisect_by=Plane(origin=(0.25078898, 29.7434, -19.845907929), z_dir=(0, 1, 0)), keep=Keep.TOP, mode=Mode.PRIVATE)
    add(fillet3_piece_11, mode=Mode.SUBTRACT)
    with BuildSketch(Plane(origin=(37.460940639, -1.403378995, -17.356840639), x_dir=(0.2539507863350758, 0.3990655213836938, 0.8810537485094523), z_dir=(0.47301616487963993, 0.7433111162394348, -0.47301616487963993)), Plane(origin=(37.460940639, -1.403378995, -2.671059361), x_dir=(-0.8810537485094524, 0.3990655213836928, 0.2539507863350774), z_dir=(0.4730161648796399, 0.7433111162394347, 0.47301616487964027))) as fillet3_piece_12:
        with BuildLine():
            CenterArc((FILLET3_R * 0.743311116239, -FILLET3_R), FILLET3_R, 90, 73.247664886)
            Line((-FILLET3_R * 0.21424849821, -FILLET3_R * 0.711764705882), (0, 0))
            Line((0, 0), (FILLET3_R * 0.743311116239, 0))
        make_face()
    extrude(amount=7.534877212, mode=Mode.SUBTRACT)
    with BuildSketch(Plane(origin=(40.132, 0.254, 0), x_dir=(-1, 0, 0), z_dir=(0, 1, 0))) as fillet3_piece_13_section:
        with BuildLine():
            CenterArc((FILLET3_R, -FILLET3_R), FILLET3_R, 90, 90)
            Line((0, -FILLET3_R), (0, 0))
            Line((0, 0), (FILLET3_R, 0))
        make_face()
    fillet3_piece_13 = extrude(amount=38.1635, mode=Mode.PRIVATE)
    fillet3_piece_13 = split(fillet3_piece_13, bisect_by=Plane(origin=(39.88121102, 27.1272, -0.181992071), z_dir=(0, -1, 0)), keep=Keep.TOP, mode=Mode.PRIVATE)
    fillet3_piece_13 = split(fillet3_piece_13, bisect_by=Plane(origin=(39.88121102, 13.6906, -0.57785), z_dir=(0, 0, 1)), keep=Keep.TOP, mode=Mode.PRIVATE)
    add(fillet3_piece_13, mode=Mode.SUBTRACT)
    with BuildSketch(Plane(origin=(40.132, 0.254, 0), x_dir=(-1, 0, 0), z_dir=(0, 1, 0))) as fillet3_piece_14_section:
        with BuildLine():
            CenterArc((FILLET3_R, -FILLET3_R), FILLET3_R, 90, 90)
            Line((0, -FILLET3_R), (0, 0))
            Line((0, 0), (FILLET3_R, 0))
        make_face()
    fillet3_piece_14 = extrude(amount=38.1635, mode=Mode.PRIVATE)
    fillet3_piece_14 = split(fillet3_piece_14, bisect_by=Plane(origin=(40.117756471, 27.1272, -0.728902871), z_dir=(0, -1, 0)), keep=Keep.TOP, mode=Mode.PRIVATE)
    fillet3_piece_14 = split(fillet3_piece_14, bisect_by=Plane(origin=(40.117756471, 13.6906, -0.57785), z_dir=(0, 0, -1)), keep=Keep.TOP, mode=Mode.PRIVATE)
    add(fillet3_piece_14, mode=Mode.SUBTRACT)
    with BuildSketch(Plane(origin=(40.132, 0.254, 0), x_dir=(-1, 0, 0), z_dir=(0, 1, 0))) as fillet3_piece_15_section:
        with BuildLine():
            CenterArc((FILLET3_R, -FILLET3_R), FILLET3_R, 90, 90)
            Line((0, -FILLET3_R), (0, 0))
            Line((0, 0), (FILLET3_R, 0))
        make_face()
    fillet3_piece_15 = extrude(amount=38.1635, mode=Mode.PRIVATE)
    fillet3_piece_15 = split(fillet3_piece_15, bisect_by=Plane(origin=(39.88121102, 29.7434, -0.181992071), z_dir=(0, -1, 0)), keep=Keep.TOP, mode=Mode.PRIVATE)
    fillet3_piece_15 = split(fillet3_piece_15, bisect_by=Plane(origin=(39.88121102, 27.1272, -0.181992071), z_dir=(0, 1, 0)), keep=Keep.TOP, mode=Mode.PRIVATE)
    fillet3_piece_15 = split(fillet3_piece_15, bisect_by=Plane(origin=(39.88121102, 28.4353, -0.57785), z_dir=(0, 0, 1)), keep=Keep.TOP, mode=Mode.PRIVATE)
    add(fillet3_piece_15, mode=Mode.SUBTRACT)
    with BuildSketch(Plane(origin=(40.132, 0.254, 0), x_dir=(-1, 0, 0), z_dir=(0, 1, 0))) as fillet3_piece_16_section:
        with BuildLine():
            CenterArc((FILLET3_R, -FILLET3_R), FILLET3_R, 90, 90)
            Line((0, -FILLET3_R), (0, 0))
            Line((0, 0), (FILLET3_R, 0))
        make_face()
    fillet3_piece_16 = extrude(amount=38.1635, mode=Mode.PRIVATE)
    fillet3_piece_16 = split(fillet3_piece_16, bisect_by=Plane(origin=(39.88121102, 29.7434, -0.181992071), z_dir=(0, 1, 0)), keep=Keep.TOP, mode=Mode.PRIVATE)
    fillet3_piece_16 = split(fillet3_piece_16, bisect_by=Plane(origin=(39.88121102, 34.08045, -0.57785), z_dir=(0, 0, 1)), keep=Keep.TOP, mode=Mode.PRIVATE)
    add(fillet3_piece_16, mode=Mode.SUBTRACT)
    with BuildSketch(Plane(origin=(40.132, 0.254, 0), x_dir=(-1, 0, 0), z_dir=(0, 1, 0))) as fillet3_piece_17_section:
        with BuildLine():
            CenterArc((FILLET3_R, -FILLET3_R), FILLET3_R, 90, 90)
            Line((0, -FILLET3_R), (0, 0))
            Line((0, 0), (FILLET3_R, 0))
        make_face()
    fillet3_piece_17 = extrude(amount=38.1635, mode=Mode.PRIVATE)
    fillet3_piece_17 = split(fillet3_piece_17, bisect_by=Plane(origin=(40.117756471, 29.7434, -0.728902871), z_dir=(0, 1, 0)), keep=Keep.TOP, mode=Mode.PRIVATE)
    fillet3_piece_17 = split(fillet3_piece_17, bisect_by=Plane(origin=(40.117756471, 34.08045, -0.57785), z_dir=(0, 0, -1)), keep=Keep.TOP, mode=Mode.PRIVATE)
    add(fillet3_piece_17, mode=Mode.SUBTRACT)
    with BuildSketch(Plane(origin=(40.132, 0.254, -20.0279), x_dir=(0, 0, 1), z_dir=(0, 1, 0))) as fillet3_piece_18_section:
        with BuildLine():
            CenterArc((FILLET3_R, -FILLET3_R), FILLET3_R, 90, 90)
            Line((0, -FILLET3_R), (0, 0))
            Line((0, 0), (FILLET3_R, 0))
        make_face()
    fillet3_piece_18 = extrude(amount=38.1635, mode=Mode.PRIVATE)
    fillet3_piece_18 = split(fillet3_piece_18, bisect_by=Plane(origin=(40.117756471, 13.6906, -19.45005), z_dir=(0, 0, 1)), keep=Keep.TOP, mode=Mode.PRIVATE)
    fillet3_piece_18 = split(fillet3_piece_18, bisect_by=Plane(origin=(40.117756471, 27.1272, -19.298997129), z_dir=(0, -1, 0)), keep=Keep.TOP, mode=Mode.PRIVATE)
    add(fillet3_piece_18, mode=Mode.SUBTRACT)
    with BuildSketch(Plane(origin=(40.132, 0.254, -20.0279), x_dir=(0, 0, 1), z_dir=(0, 1, 0))) as fillet3_piece_19_section:
        with BuildLine():
            CenterArc((FILLET3_R, -FILLET3_R), FILLET3_R, 90, 90)
            Line((0, -FILLET3_R), (0, 0))
            Line((0, 0), (FILLET3_R, 0))
        make_face()
    fillet3_piece_19 = extrude(amount=38.1635, mode=Mode.PRIVATE)
    fillet3_piece_19 = split(fillet3_piece_19, bisect_by=Plane(origin=(39.88121102, 13.6906, -19.45005), z_dir=(0, 0, -1)), keep=Keep.TOP, mode=Mode.PRIVATE)
    fillet3_piece_19 = split(fillet3_piece_19, bisect_by=Plane(origin=(39.88121102, 27.1272, -19.845907929), z_dir=(0, -1, 0)), keep=Keep.TOP, mode=Mode.PRIVATE)
    add(fillet3_piece_19, mode=Mode.SUBTRACT)
    with BuildSketch(Plane(origin=(40.132, 0.254, -20.0279), x_dir=(0, 0, 1), z_dir=(0, 1, 0))) as fillet3_piece_20_section:
        with BuildLine():
            CenterArc((FILLET3_R, -FILLET3_R), FILLET3_R, 90, 90)
            Line((0, -FILLET3_R), (0, 0))
            Line((0, 0), (FILLET3_R, 0))
        make_face()
    fillet3_piece_20 = extrude(amount=38.1635, mode=Mode.PRIVATE)
    fillet3_piece_20 = split(fillet3_piece_20, bisect_by=Plane(origin=(39.88121102, 29.7434, -19.845907929), z_dir=(0, -1, 0)), keep=Keep.TOP, mode=Mode.PRIVATE)
    fillet3_piece_20 = split(fillet3_piece_20, bisect_by=Plane(origin=(39.88121102, 28.4353, -19.45005), z_dir=(0, 0, -1)), keep=Keep.TOP, mode=Mode.PRIVATE)
    fillet3_piece_20 = split(fillet3_piece_20, bisect_by=Plane(origin=(39.88121102, 27.1272, -19.845907929), z_dir=(0, 1, 0)), keep=Keep.TOP, mode=Mode.PRIVATE)
    add(fillet3_piece_20, mode=Mode.SUBTRACT)
    with BuildSketch(Plane(origin=(40.132, 0.254, -20.0279), x_dir=(0, 0, 1), z_dir=(0, 1, 0))) as fillet3_piece_21_section:
        with BuildLine():
            CenterArc((FILLET3_R, -FILLET3_R), FILLET3_R, 90, 90)
            Line((0, -FILLET3_R), (0, 0))
            Line((0, 0), (FILLET3_R, 0))
        make_face()
    fillet3_piece_21 = extrude(amount=38.1635, mode=Mode.PRIVATE)
    fillet3_piece_21 = split(fillet3_piece_21, bisect_by=Plane(origin=(40.117756471, 29.7434, -19.298997129), z_dir=(0, 1, 0)), keep=Keep.TOP, mode=Mode.PRIVATE)
    fillet3_piece_21 = split(fillet3_piece_21, bisect_by=Plane(origin=(40.117756471, 34.08045, -19.45005), z_dir=(0, 0, 1)), keep=Keep.TOP, mode=Mode.PRIVATE)
    add(fillet3_piece_21, mode=Mode.SUBTRACT)
    with BuildSketch(Plane(origin=(40.132, 0.254, -20.0279), x_dir=(0, 0, 1), z_dir=(0, 1, 0))) as fillet3_piece_22_section:
        with BuildLine():
            CenterArc((FILLET3_R, -FILLET3_R), FILLET3_R, 90, 90)
            Line((0, -FILLET3_R), (0, 0))
            Line((0, 0), (FILLET3_R, 0))
        make_face()
    fillet3_piece_22 = extrude(amount=38.1635, mode=Mode.PRIVATE)
    fillet3_piece_22 = split(fillet3_piece_22, bisect_by=Plane(origin=(39.88121102, 29.7434, -19.845907929), z_dir=(0, 1, 0)), keep=Keep.TOP, mode=Mode.PRIVATE)
    fillet3_piece_22 = split(fillet3_piece_22, bisect_by=Plane(origin=(39.88121102, 34.08045, -19.45005), z_dir=(0, 0, -1)), keep=Keep.TOP, mode=Mode.PRIVATE)
    add(fillet3_piece_22, mode=Mode.SUBTRACT)

    # Sketch12 → Boss-Extrude7 (add)
    with BuildSketch(Plane(origin=(0, 38.1635, 0), x_dir=(1, 0, 0), z_dir=(0, 1, 0))):
        with Locations(Location((30.1625, 10.01395, 0), (0, 0, 90))):
            Circle(SKETCH12_R)
    extrude(amount=BOSS_EXTRUDE7_DEPTH)

    # Sketch13 → Boss-Extrude8 (add)
    with BuildSketch(Plane(origin=(0, 39.116, 0), x_dir=(1, 0, 0), z_dir=(0, 1, 0))):
        with Locations(Location((30.1625, 10.01395, 0), (0, 0, 270))):
            Circle(SKETCH13_R)
    extrude(amount=BOSS_EXTRUDE8_DEPTH)

    # Sketch15 → Boss-Extrude9 (add)
    with BuildSketch(Plane(origin=(0, 40.386, 0), x_dir=(1, 0, 0), z_dir=(0, 1, 0))):
        with Locations(Location((30.1625, 10.01395, 0), (0, 0, 270))):
            Circle(SKETCH15_R)
    extrude(amount=BOSS_EXTRUDE9_DEPTH)

    # Sketch16 → Boss-Extrude10 (add)
    with BuildSketch(Plane(origin=(0, 38.1635, 0), x_dir=(1, 0, 0), z_dir=(0, 1, 0))):
        with Locations((14.732, 10.01395)):
            Rectangle(SKETCH16_W, SKETCH16_H)
    extrude(amount=BOSS_EXTRUDE10_DEPTH)

    # Fillet4
    fillet4_edges = [part.edges().sort_by_distance(p)[0] for p in [
        (14.732, 38.6715, -17.25295),
        (22.225, 38.6715, -10.01395),
        (14.732, 38.6715, -2.77495),
        (7.239, 38.6715, -10.01395),
    ]]
    fillet(fillet4_edges, radius=FILLET4_R - 0.0001)  # a hair under: the kernel refuses the full size


solid = part.part
